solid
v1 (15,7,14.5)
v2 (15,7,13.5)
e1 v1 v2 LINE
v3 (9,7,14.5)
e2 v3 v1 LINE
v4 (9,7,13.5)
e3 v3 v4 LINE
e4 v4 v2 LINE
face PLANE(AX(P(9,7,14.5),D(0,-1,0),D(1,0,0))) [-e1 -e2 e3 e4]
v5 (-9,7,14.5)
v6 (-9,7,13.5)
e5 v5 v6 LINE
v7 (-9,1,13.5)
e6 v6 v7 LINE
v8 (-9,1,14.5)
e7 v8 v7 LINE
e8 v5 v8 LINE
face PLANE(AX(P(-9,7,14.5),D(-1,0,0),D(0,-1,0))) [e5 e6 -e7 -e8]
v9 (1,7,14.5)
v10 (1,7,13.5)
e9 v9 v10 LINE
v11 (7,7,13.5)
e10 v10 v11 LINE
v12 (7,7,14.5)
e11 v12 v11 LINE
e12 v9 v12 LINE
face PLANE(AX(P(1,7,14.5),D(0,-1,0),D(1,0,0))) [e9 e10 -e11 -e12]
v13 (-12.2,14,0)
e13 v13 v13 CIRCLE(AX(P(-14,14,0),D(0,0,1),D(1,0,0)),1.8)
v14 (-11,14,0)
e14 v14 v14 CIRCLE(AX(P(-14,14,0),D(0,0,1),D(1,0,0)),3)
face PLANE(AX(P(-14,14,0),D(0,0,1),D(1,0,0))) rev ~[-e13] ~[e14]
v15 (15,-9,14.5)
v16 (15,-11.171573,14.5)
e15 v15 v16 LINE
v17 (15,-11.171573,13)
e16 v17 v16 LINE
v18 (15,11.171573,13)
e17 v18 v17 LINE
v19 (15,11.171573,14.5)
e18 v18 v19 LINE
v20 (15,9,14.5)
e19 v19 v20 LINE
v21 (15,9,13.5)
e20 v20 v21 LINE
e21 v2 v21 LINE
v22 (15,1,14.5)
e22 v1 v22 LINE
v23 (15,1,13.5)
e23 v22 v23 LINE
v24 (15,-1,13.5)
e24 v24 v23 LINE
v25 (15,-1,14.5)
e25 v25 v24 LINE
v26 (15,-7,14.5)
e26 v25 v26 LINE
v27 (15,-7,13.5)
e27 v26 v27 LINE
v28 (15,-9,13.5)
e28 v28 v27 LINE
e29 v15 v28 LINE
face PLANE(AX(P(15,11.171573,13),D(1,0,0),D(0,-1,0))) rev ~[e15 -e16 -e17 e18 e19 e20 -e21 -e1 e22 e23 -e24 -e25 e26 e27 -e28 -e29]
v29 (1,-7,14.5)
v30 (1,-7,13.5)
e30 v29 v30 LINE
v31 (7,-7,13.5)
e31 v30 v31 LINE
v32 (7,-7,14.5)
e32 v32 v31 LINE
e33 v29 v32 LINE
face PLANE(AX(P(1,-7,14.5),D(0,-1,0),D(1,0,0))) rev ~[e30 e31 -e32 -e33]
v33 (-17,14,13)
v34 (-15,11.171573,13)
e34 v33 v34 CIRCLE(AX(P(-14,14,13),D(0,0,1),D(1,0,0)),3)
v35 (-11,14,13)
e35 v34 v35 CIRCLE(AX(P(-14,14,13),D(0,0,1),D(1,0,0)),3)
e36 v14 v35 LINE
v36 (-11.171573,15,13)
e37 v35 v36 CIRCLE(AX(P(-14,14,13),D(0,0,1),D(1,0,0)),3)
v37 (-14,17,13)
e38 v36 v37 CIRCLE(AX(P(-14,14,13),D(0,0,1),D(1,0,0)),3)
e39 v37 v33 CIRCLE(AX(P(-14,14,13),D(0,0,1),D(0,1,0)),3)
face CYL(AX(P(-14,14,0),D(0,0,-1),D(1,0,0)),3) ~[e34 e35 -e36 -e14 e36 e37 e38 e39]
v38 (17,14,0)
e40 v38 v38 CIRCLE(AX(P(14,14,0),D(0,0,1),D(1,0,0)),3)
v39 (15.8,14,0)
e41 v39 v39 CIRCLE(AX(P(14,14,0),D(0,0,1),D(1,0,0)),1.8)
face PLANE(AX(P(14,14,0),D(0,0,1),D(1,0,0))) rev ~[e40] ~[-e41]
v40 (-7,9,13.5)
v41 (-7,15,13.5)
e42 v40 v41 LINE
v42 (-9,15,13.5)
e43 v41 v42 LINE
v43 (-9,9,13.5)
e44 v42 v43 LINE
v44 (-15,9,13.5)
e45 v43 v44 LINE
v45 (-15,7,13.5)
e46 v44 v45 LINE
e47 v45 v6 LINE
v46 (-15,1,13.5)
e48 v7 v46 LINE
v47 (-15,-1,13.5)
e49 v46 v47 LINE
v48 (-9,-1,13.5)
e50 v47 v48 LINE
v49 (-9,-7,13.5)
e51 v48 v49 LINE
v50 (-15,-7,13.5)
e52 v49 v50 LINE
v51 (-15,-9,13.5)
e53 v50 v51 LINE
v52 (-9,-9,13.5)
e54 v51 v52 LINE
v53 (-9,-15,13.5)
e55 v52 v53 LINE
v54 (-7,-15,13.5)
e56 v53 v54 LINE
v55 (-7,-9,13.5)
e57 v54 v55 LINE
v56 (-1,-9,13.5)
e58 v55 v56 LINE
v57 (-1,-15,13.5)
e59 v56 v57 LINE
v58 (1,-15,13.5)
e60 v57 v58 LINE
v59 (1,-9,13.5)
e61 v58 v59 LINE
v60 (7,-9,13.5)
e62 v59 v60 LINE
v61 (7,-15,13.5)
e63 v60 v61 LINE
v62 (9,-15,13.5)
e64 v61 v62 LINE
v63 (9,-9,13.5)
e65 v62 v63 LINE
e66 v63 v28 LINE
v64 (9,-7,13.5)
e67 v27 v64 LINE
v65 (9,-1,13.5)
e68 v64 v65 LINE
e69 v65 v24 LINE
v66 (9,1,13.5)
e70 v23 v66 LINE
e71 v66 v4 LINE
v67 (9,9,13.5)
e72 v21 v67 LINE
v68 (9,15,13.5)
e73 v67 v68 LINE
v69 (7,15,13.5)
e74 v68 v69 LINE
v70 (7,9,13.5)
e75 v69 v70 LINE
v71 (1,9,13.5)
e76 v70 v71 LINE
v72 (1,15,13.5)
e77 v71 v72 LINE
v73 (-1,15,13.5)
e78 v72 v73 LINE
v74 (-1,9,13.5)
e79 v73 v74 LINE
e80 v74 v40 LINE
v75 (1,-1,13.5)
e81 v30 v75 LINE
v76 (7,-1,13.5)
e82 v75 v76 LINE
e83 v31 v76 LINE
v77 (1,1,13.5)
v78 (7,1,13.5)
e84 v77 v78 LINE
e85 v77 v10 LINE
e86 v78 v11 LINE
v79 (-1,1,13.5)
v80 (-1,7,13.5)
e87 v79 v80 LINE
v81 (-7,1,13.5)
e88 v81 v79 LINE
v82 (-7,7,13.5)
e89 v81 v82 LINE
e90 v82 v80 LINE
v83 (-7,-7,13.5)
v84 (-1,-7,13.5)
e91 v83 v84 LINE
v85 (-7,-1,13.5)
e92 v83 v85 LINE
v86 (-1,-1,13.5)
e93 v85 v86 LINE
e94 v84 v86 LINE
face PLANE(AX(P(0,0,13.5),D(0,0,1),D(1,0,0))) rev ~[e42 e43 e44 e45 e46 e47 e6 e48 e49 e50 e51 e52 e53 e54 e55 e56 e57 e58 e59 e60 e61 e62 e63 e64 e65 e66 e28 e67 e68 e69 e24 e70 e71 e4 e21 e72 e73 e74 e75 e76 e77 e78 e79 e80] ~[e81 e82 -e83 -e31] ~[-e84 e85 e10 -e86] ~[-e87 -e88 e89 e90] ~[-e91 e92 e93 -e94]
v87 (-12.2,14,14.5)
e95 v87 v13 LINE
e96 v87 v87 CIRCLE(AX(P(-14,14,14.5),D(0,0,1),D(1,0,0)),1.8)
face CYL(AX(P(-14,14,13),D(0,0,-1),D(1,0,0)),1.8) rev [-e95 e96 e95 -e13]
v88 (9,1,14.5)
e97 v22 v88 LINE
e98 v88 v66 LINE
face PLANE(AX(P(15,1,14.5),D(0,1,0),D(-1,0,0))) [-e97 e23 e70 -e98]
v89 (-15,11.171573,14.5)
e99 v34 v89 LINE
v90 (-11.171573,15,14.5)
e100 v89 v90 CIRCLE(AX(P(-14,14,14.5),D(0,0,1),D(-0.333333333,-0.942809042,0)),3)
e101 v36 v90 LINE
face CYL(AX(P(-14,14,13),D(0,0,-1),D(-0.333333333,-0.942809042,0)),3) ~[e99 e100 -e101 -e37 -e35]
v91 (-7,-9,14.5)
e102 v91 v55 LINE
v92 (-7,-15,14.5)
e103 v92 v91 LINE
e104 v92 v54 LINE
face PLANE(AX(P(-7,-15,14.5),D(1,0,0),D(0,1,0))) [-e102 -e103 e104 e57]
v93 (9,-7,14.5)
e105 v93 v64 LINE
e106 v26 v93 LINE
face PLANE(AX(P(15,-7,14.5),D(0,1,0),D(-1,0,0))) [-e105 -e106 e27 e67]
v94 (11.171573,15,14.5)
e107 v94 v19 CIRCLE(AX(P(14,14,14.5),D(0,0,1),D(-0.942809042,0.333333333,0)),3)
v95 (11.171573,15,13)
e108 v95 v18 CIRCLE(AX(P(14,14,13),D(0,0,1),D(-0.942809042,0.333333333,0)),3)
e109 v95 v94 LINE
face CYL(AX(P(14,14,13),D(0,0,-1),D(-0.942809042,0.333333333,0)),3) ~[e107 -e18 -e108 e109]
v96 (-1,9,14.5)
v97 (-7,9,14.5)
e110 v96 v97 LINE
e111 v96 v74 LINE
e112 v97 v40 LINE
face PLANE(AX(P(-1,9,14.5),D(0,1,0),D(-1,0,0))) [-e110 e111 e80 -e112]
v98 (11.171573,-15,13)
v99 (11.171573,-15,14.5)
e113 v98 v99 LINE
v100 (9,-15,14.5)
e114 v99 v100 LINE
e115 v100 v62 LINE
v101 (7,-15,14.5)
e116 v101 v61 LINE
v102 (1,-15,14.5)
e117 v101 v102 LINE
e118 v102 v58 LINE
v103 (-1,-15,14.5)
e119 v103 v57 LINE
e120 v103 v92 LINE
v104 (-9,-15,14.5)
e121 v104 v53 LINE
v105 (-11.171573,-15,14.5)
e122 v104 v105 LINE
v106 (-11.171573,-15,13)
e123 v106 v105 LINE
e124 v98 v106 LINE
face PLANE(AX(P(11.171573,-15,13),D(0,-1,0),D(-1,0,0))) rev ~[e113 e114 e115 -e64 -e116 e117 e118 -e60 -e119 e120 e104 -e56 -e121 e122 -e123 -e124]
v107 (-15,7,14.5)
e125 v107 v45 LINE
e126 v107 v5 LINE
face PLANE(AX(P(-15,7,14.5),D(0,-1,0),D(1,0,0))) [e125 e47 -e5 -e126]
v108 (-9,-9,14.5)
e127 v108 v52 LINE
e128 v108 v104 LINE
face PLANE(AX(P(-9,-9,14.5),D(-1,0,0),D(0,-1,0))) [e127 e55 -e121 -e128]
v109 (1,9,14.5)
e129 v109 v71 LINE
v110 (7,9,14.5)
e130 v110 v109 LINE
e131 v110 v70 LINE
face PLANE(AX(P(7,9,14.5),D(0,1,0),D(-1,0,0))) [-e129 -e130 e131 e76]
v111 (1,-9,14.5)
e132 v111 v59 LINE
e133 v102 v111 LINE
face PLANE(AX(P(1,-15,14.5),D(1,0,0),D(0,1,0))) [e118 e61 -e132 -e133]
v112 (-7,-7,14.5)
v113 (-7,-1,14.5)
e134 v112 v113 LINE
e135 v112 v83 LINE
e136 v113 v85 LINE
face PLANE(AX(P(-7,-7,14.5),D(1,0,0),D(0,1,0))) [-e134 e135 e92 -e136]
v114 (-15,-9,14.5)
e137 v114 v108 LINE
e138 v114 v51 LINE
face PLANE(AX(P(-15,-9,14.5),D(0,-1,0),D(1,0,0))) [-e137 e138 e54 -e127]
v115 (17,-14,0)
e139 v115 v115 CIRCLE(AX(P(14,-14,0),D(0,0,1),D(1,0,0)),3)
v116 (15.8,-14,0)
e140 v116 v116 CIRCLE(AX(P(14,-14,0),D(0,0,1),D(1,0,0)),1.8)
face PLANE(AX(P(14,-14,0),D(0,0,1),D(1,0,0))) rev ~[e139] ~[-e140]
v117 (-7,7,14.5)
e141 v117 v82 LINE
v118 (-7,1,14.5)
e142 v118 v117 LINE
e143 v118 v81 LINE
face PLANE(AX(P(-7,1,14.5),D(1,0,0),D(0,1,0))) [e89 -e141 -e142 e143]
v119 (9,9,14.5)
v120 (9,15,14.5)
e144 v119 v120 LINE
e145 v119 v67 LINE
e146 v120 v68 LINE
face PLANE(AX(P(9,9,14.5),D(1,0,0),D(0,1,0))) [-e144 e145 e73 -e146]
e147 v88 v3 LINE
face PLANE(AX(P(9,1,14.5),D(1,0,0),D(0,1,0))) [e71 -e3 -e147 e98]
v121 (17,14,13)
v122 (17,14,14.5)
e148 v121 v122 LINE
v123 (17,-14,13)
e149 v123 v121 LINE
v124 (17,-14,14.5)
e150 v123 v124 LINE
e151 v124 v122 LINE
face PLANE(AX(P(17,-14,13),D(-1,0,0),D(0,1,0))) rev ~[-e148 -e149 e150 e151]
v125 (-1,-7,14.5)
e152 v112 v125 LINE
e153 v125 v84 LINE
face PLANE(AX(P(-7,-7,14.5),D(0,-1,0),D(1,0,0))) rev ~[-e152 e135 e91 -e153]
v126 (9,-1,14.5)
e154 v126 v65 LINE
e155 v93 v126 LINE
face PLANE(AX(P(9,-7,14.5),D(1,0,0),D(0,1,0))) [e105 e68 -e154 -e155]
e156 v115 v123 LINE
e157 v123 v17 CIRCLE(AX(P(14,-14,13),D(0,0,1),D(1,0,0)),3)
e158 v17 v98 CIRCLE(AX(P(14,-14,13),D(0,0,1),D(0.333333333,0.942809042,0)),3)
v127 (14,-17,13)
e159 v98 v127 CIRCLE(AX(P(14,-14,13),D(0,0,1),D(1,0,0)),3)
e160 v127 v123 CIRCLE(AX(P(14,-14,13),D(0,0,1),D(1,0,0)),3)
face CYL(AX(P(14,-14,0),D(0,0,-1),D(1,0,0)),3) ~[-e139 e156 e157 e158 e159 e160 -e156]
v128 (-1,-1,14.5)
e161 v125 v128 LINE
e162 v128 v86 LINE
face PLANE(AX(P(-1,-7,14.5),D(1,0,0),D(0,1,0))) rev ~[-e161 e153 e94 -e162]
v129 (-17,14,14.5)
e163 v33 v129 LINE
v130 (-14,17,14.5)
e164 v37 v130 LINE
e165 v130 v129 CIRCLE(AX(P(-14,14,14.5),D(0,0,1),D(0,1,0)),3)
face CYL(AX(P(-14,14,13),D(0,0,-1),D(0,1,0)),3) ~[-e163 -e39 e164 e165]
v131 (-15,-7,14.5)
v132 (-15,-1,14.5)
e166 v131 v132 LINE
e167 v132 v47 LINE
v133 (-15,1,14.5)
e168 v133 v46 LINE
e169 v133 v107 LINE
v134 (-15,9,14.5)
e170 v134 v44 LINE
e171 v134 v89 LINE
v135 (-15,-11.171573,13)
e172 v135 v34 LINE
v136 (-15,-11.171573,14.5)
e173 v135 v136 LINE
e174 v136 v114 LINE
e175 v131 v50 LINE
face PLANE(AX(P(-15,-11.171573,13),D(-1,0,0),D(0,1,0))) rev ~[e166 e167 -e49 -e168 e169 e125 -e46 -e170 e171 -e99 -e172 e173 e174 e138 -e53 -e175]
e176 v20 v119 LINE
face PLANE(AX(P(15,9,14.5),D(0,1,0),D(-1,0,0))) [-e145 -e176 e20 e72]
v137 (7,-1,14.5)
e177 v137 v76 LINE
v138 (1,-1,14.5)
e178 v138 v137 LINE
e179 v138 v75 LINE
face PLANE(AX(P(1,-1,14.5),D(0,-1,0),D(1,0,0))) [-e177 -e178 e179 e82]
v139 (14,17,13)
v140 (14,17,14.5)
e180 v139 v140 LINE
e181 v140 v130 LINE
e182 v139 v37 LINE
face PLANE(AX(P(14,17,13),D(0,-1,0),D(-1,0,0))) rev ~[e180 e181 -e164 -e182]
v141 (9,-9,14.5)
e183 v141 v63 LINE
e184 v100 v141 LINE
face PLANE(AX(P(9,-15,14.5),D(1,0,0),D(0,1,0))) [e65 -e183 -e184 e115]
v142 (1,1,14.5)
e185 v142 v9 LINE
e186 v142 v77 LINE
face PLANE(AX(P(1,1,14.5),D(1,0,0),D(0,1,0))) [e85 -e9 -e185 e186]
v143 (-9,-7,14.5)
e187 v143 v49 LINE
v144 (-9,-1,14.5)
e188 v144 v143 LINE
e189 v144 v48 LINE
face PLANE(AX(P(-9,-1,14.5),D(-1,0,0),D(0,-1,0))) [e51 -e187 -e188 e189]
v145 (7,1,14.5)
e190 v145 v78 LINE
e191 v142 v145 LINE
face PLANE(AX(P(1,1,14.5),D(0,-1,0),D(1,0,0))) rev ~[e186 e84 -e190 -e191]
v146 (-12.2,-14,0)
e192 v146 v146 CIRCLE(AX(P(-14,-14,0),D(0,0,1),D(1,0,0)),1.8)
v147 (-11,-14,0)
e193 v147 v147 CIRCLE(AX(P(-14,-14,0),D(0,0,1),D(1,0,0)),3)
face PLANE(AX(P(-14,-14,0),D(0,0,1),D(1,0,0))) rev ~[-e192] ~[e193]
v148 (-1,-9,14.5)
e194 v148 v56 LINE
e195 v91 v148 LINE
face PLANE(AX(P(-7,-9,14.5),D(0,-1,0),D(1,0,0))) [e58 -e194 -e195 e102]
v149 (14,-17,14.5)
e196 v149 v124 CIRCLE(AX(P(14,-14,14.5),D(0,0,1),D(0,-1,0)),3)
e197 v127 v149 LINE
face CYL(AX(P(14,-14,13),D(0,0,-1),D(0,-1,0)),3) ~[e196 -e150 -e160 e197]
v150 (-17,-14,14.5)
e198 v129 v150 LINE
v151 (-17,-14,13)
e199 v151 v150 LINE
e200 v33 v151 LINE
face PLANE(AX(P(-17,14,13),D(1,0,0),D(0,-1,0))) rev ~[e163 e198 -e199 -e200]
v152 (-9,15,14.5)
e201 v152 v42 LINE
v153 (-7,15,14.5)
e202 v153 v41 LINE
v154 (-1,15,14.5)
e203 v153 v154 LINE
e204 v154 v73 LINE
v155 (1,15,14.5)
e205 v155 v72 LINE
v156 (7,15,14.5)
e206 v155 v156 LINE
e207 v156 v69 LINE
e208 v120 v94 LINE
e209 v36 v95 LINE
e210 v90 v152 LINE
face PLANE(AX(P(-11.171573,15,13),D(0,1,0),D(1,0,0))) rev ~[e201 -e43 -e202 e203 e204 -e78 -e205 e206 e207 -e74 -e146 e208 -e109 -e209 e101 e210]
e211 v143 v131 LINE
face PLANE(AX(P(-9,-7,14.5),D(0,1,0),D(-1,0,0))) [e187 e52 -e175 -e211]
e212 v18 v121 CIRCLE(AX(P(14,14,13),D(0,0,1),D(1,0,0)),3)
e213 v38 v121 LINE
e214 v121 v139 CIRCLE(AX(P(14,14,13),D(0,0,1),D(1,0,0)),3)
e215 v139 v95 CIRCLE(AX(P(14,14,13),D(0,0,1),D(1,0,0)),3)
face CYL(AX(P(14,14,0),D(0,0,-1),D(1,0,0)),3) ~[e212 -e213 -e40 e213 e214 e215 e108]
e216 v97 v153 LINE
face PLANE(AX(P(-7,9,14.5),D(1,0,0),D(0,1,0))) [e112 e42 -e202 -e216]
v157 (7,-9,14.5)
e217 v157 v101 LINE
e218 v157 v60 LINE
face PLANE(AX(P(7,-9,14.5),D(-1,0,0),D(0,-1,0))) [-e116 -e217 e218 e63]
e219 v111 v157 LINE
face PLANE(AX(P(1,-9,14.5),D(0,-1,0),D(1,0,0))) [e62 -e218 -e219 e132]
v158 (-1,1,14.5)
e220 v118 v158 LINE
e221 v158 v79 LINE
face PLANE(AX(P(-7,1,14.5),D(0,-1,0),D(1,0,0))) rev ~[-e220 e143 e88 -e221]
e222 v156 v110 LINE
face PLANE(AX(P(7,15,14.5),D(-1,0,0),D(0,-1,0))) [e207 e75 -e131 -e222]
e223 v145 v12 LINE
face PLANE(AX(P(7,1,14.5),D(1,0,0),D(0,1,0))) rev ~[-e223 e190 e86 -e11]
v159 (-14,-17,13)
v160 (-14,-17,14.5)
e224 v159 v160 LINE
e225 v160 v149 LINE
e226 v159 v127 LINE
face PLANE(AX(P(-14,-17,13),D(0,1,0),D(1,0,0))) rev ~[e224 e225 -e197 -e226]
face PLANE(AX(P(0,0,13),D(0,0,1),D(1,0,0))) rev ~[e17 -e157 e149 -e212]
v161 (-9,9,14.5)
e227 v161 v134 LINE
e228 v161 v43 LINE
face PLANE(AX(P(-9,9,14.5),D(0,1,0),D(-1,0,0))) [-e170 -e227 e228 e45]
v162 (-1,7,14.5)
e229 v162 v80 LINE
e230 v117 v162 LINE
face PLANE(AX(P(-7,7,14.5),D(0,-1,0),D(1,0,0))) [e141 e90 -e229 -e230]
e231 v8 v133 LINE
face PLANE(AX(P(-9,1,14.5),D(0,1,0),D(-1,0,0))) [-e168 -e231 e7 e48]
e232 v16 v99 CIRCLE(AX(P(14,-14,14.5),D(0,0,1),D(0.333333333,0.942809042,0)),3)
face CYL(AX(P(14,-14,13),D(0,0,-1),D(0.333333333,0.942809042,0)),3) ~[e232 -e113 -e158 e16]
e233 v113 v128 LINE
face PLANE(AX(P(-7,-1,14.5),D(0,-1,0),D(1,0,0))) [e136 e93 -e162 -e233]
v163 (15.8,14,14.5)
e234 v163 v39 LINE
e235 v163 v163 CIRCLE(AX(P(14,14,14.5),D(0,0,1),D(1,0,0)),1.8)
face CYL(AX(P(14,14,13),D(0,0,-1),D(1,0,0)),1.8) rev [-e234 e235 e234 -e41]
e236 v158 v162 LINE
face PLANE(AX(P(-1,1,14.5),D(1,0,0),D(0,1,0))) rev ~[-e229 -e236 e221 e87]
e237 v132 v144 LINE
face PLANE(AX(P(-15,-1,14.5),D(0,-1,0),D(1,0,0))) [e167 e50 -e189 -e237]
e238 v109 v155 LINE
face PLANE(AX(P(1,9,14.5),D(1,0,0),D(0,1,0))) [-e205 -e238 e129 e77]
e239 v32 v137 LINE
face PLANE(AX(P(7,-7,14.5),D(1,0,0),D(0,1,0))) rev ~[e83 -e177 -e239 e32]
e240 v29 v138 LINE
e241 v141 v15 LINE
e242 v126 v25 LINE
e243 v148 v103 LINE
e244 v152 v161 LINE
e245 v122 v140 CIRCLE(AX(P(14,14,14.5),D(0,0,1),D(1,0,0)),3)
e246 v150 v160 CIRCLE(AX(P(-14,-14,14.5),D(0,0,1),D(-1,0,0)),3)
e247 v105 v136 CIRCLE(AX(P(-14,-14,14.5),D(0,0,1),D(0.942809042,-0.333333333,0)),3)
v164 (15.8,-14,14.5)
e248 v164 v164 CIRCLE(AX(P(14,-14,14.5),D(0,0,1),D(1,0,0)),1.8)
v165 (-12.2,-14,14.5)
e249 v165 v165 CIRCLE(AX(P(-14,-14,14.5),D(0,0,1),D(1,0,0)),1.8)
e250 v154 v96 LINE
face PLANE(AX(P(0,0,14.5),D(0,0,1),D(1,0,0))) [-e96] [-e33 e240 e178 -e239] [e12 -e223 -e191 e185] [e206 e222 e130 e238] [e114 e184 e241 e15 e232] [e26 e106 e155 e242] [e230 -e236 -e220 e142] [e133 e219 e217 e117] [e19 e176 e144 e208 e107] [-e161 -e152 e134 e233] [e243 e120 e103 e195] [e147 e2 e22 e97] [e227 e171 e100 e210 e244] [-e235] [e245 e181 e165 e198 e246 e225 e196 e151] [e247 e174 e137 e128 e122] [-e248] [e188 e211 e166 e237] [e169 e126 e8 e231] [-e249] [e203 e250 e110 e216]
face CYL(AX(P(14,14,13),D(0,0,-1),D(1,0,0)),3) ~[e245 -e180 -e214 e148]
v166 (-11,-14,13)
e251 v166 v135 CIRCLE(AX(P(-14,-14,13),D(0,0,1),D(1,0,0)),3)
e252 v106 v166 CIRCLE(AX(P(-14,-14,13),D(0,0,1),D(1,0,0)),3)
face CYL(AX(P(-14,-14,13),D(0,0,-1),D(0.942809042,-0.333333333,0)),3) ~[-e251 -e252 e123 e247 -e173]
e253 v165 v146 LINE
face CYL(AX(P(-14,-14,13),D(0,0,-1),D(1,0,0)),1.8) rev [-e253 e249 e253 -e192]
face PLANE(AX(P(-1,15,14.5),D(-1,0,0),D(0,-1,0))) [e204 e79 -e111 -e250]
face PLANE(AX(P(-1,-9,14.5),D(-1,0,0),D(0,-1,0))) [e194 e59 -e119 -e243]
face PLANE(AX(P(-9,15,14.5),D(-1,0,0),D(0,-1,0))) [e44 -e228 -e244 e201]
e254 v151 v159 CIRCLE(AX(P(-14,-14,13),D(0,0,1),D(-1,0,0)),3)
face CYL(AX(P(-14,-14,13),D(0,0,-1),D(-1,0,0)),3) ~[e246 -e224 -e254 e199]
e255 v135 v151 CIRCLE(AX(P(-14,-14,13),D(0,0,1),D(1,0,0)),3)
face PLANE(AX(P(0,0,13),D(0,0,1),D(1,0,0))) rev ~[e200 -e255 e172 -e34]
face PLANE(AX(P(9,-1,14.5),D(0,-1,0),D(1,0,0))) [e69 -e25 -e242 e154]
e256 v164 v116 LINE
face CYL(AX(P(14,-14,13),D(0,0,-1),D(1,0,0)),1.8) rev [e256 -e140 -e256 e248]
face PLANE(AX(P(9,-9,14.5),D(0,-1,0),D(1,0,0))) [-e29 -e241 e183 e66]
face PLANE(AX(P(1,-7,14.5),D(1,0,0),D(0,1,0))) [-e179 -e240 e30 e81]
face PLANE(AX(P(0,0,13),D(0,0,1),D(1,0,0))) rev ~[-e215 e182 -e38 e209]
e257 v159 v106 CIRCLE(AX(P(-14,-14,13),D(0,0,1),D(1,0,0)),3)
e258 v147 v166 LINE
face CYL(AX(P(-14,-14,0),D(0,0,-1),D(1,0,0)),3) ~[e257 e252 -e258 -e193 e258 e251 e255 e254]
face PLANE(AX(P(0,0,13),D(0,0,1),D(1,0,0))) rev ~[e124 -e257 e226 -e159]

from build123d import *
from build123d import SkipClean  # not in build123d's __all__

# Parameters (mm, degrees)
F0_R     = 3
F0_R_2   = 1.8
F1_DEPTH = 13
F2_R     = 1.8
F3_DEPTH = 1.5
F4_W     = 6
F4_H     = 6
F5_DEPTH = 1


with BuildPart() as f1:
    # F0 (on Top) → F1 (new body)
    with BuildSketch(Plane.XY):
        with Locations((-14, 14)):
            Circle(F0_R)
        with Locations((-14, 14)):
            Circle(F0_R_2, mode=Mode.SUBTRACT)
    extrude(amount=F1_DEPTH)



with BuildPart() as f1b:
    # F0 (on Top) → F1, piece 2 (new body)
    with BuildSketch(Plane.XY):
        with Locations((-14, -14)):
            Circle(F0_R)
        with Locations((-14, -14)):
            Circle(F0_R_2, mode=Mode.SUBTRACT)
    extrude(amount=F1_DEPTH)


with BuildPart() as f1c:
    # F0 (on Top) → F1, piece 3 (new body)
    with BuildSketch(Plane.XY):
        with Locations((14, -14)):
            Circle(F0_R)
        with Locations((14, -14)):
            Circle(F0_R_2, mode=Mode.SUBTRACT)
    extrude(amount=F1_DEPTH)


with BuildPart() as f1d:
    # F0 (on Top) → F1, piece 4 (new body)
    with BuildSketch(Plane.XY):
        with Locations((14, 14)):
            Circle(F0_R)
        with Locations((14, 14)):
            Circle(F0_R_2, mode=Mode.SUBTRACT)
    extrude(amount=F1_DEPTH)


with BuildPart() as f1_1:
    add(f1.part, clean=False)

    with SkipClean():  # cleaning this boolean's faces spoils the solid; the shape is the same uncleaned
        add(f1b.part)  # F3 merges F1b

    with SkipClean():  # cleaning this boolean's faces spoils the solid; the shape is the same uncleaned
        add(f1c.part)  # F3 merges F1c

    with SkipClean():  # cleaning this boolean's faces spoils the solid; the shape is the same uncleaned
        add(f1d.part)  # F3 merges F1d
    # F2 (on face) → F3 (join)
    with BuildSketch(Plane.XY.offset(13)):
        with BuildLine():
            Line((14, 17), (-14, 17))
            ThreePointArc((-14, 17), (-16.1213203436, 16.1213203436), (-17, 14))
            Line((-17, 14), (-17, -14))
            ThreePointArc((-17, -14), (-16.1213203436, -16.1213203436), (-14, -17))
            Line((-14, -17), (14, -17))
            ThreePointArc((14, -17), (16.1213203436, -16.1213203436), (17, -14))
            Line((17, -14), (17, 14))
            ThreePointArc((17, 14), (16.1213203436, 16.1213203436), (14, 17))
        make_face()
        with Locations((-14, -14)):
            Circle(F2_R, mode=Mode.SUBTRACT)
        with Locations((14, -14)):
            Circle(F2_R, mode=Mode.SUBTRACT)
        with Locations((-14, 14)):
            Circle(F2_R, mode=Mode.SUBTRACT)
        with BuildLine():
            Line((-15, -11.1715728753), (-15, 11.1715728753))
            ThreePointArc((-15, 11.1715728753), (-11.8786796564, 11.8786796564), (-11.1715728753, 15))
            Line((-11.1715728753, 15), (11.1715728753, 15))
            ThreePointArc((11.1715728753, 15), (11.8786796564, 11.8786796564), (15, 11.1715728753))
            Line((15, 11.1715728753), (15, -11.1715728753))
            ThreePointArc((15, -11.1715728753), (11.8786796564, -11.8786796564), (11.1715728753, -15))
            Line((11.1715728753, -15), (-11.1715728753, -15))
            ThreePointArc((-11.1715728753, -15), (-11.8786796564, -11.8786796564), (-15, -11.1715728753))
        make_face(mode=Mode.SUBTRACT)
        with Locations((14, 14)):
            Circle(F2_R, mode=Mode.SUBTRACT)
    with SkipClean():  # cleaning this boolean's faces spoils the solid; the shape is the same uncleaned
        extrude(amount=F3_DEPTH)

    # F4 (on face) → F5 (join)
    with BuildSketch(Plane.XY.offset(14.5)):
        Polygon((1, 15), (-1, 15), (-1, 9), (-7, 9), (-7, 15), (-9, 15), (-9, 9), (-15, 9), (-15, 7), (-9, 7), (-9, 1), (-15, 1), (-15, -1), (-9, -1), (-9, -7), (-15, -7), (-15, -9), (-9, -9), (-9, -15), (-7, -15), (-7, -9), (-1, -9), (-1, -15), (1, -15), (1, -9), (7, -9), (7, -15), (9, -15), (9, -9), (15, -9), (15, -7), (9, -7), (9, -1), (15, -1), (15, 1), (9, 1), (9, 7), (15, 7), (15, 9), (9, 9), (9, 15), (7, 15), (7, 9), (1, 9), align=None)
        with Locations((-4, -4)):
            Rectangle(F4_W, F4_H, mode=Mode.SUBTRACT)
        with Locations((4, -4)):
            Rectangle(F4_W, F4_H, mode=Mode.SUBTRACT)
        with Locations((-4, 4)):
            Rectangle(F4_W, F4_H, mode=Mode.SUBTRACT)
        with Locations((4, 4)):
            Rectangle(F4_W, F4_H, mode=Mode.SUBTRACT)
    extrude(amount=-F5_DEPTH)


solid = f1_1.part
